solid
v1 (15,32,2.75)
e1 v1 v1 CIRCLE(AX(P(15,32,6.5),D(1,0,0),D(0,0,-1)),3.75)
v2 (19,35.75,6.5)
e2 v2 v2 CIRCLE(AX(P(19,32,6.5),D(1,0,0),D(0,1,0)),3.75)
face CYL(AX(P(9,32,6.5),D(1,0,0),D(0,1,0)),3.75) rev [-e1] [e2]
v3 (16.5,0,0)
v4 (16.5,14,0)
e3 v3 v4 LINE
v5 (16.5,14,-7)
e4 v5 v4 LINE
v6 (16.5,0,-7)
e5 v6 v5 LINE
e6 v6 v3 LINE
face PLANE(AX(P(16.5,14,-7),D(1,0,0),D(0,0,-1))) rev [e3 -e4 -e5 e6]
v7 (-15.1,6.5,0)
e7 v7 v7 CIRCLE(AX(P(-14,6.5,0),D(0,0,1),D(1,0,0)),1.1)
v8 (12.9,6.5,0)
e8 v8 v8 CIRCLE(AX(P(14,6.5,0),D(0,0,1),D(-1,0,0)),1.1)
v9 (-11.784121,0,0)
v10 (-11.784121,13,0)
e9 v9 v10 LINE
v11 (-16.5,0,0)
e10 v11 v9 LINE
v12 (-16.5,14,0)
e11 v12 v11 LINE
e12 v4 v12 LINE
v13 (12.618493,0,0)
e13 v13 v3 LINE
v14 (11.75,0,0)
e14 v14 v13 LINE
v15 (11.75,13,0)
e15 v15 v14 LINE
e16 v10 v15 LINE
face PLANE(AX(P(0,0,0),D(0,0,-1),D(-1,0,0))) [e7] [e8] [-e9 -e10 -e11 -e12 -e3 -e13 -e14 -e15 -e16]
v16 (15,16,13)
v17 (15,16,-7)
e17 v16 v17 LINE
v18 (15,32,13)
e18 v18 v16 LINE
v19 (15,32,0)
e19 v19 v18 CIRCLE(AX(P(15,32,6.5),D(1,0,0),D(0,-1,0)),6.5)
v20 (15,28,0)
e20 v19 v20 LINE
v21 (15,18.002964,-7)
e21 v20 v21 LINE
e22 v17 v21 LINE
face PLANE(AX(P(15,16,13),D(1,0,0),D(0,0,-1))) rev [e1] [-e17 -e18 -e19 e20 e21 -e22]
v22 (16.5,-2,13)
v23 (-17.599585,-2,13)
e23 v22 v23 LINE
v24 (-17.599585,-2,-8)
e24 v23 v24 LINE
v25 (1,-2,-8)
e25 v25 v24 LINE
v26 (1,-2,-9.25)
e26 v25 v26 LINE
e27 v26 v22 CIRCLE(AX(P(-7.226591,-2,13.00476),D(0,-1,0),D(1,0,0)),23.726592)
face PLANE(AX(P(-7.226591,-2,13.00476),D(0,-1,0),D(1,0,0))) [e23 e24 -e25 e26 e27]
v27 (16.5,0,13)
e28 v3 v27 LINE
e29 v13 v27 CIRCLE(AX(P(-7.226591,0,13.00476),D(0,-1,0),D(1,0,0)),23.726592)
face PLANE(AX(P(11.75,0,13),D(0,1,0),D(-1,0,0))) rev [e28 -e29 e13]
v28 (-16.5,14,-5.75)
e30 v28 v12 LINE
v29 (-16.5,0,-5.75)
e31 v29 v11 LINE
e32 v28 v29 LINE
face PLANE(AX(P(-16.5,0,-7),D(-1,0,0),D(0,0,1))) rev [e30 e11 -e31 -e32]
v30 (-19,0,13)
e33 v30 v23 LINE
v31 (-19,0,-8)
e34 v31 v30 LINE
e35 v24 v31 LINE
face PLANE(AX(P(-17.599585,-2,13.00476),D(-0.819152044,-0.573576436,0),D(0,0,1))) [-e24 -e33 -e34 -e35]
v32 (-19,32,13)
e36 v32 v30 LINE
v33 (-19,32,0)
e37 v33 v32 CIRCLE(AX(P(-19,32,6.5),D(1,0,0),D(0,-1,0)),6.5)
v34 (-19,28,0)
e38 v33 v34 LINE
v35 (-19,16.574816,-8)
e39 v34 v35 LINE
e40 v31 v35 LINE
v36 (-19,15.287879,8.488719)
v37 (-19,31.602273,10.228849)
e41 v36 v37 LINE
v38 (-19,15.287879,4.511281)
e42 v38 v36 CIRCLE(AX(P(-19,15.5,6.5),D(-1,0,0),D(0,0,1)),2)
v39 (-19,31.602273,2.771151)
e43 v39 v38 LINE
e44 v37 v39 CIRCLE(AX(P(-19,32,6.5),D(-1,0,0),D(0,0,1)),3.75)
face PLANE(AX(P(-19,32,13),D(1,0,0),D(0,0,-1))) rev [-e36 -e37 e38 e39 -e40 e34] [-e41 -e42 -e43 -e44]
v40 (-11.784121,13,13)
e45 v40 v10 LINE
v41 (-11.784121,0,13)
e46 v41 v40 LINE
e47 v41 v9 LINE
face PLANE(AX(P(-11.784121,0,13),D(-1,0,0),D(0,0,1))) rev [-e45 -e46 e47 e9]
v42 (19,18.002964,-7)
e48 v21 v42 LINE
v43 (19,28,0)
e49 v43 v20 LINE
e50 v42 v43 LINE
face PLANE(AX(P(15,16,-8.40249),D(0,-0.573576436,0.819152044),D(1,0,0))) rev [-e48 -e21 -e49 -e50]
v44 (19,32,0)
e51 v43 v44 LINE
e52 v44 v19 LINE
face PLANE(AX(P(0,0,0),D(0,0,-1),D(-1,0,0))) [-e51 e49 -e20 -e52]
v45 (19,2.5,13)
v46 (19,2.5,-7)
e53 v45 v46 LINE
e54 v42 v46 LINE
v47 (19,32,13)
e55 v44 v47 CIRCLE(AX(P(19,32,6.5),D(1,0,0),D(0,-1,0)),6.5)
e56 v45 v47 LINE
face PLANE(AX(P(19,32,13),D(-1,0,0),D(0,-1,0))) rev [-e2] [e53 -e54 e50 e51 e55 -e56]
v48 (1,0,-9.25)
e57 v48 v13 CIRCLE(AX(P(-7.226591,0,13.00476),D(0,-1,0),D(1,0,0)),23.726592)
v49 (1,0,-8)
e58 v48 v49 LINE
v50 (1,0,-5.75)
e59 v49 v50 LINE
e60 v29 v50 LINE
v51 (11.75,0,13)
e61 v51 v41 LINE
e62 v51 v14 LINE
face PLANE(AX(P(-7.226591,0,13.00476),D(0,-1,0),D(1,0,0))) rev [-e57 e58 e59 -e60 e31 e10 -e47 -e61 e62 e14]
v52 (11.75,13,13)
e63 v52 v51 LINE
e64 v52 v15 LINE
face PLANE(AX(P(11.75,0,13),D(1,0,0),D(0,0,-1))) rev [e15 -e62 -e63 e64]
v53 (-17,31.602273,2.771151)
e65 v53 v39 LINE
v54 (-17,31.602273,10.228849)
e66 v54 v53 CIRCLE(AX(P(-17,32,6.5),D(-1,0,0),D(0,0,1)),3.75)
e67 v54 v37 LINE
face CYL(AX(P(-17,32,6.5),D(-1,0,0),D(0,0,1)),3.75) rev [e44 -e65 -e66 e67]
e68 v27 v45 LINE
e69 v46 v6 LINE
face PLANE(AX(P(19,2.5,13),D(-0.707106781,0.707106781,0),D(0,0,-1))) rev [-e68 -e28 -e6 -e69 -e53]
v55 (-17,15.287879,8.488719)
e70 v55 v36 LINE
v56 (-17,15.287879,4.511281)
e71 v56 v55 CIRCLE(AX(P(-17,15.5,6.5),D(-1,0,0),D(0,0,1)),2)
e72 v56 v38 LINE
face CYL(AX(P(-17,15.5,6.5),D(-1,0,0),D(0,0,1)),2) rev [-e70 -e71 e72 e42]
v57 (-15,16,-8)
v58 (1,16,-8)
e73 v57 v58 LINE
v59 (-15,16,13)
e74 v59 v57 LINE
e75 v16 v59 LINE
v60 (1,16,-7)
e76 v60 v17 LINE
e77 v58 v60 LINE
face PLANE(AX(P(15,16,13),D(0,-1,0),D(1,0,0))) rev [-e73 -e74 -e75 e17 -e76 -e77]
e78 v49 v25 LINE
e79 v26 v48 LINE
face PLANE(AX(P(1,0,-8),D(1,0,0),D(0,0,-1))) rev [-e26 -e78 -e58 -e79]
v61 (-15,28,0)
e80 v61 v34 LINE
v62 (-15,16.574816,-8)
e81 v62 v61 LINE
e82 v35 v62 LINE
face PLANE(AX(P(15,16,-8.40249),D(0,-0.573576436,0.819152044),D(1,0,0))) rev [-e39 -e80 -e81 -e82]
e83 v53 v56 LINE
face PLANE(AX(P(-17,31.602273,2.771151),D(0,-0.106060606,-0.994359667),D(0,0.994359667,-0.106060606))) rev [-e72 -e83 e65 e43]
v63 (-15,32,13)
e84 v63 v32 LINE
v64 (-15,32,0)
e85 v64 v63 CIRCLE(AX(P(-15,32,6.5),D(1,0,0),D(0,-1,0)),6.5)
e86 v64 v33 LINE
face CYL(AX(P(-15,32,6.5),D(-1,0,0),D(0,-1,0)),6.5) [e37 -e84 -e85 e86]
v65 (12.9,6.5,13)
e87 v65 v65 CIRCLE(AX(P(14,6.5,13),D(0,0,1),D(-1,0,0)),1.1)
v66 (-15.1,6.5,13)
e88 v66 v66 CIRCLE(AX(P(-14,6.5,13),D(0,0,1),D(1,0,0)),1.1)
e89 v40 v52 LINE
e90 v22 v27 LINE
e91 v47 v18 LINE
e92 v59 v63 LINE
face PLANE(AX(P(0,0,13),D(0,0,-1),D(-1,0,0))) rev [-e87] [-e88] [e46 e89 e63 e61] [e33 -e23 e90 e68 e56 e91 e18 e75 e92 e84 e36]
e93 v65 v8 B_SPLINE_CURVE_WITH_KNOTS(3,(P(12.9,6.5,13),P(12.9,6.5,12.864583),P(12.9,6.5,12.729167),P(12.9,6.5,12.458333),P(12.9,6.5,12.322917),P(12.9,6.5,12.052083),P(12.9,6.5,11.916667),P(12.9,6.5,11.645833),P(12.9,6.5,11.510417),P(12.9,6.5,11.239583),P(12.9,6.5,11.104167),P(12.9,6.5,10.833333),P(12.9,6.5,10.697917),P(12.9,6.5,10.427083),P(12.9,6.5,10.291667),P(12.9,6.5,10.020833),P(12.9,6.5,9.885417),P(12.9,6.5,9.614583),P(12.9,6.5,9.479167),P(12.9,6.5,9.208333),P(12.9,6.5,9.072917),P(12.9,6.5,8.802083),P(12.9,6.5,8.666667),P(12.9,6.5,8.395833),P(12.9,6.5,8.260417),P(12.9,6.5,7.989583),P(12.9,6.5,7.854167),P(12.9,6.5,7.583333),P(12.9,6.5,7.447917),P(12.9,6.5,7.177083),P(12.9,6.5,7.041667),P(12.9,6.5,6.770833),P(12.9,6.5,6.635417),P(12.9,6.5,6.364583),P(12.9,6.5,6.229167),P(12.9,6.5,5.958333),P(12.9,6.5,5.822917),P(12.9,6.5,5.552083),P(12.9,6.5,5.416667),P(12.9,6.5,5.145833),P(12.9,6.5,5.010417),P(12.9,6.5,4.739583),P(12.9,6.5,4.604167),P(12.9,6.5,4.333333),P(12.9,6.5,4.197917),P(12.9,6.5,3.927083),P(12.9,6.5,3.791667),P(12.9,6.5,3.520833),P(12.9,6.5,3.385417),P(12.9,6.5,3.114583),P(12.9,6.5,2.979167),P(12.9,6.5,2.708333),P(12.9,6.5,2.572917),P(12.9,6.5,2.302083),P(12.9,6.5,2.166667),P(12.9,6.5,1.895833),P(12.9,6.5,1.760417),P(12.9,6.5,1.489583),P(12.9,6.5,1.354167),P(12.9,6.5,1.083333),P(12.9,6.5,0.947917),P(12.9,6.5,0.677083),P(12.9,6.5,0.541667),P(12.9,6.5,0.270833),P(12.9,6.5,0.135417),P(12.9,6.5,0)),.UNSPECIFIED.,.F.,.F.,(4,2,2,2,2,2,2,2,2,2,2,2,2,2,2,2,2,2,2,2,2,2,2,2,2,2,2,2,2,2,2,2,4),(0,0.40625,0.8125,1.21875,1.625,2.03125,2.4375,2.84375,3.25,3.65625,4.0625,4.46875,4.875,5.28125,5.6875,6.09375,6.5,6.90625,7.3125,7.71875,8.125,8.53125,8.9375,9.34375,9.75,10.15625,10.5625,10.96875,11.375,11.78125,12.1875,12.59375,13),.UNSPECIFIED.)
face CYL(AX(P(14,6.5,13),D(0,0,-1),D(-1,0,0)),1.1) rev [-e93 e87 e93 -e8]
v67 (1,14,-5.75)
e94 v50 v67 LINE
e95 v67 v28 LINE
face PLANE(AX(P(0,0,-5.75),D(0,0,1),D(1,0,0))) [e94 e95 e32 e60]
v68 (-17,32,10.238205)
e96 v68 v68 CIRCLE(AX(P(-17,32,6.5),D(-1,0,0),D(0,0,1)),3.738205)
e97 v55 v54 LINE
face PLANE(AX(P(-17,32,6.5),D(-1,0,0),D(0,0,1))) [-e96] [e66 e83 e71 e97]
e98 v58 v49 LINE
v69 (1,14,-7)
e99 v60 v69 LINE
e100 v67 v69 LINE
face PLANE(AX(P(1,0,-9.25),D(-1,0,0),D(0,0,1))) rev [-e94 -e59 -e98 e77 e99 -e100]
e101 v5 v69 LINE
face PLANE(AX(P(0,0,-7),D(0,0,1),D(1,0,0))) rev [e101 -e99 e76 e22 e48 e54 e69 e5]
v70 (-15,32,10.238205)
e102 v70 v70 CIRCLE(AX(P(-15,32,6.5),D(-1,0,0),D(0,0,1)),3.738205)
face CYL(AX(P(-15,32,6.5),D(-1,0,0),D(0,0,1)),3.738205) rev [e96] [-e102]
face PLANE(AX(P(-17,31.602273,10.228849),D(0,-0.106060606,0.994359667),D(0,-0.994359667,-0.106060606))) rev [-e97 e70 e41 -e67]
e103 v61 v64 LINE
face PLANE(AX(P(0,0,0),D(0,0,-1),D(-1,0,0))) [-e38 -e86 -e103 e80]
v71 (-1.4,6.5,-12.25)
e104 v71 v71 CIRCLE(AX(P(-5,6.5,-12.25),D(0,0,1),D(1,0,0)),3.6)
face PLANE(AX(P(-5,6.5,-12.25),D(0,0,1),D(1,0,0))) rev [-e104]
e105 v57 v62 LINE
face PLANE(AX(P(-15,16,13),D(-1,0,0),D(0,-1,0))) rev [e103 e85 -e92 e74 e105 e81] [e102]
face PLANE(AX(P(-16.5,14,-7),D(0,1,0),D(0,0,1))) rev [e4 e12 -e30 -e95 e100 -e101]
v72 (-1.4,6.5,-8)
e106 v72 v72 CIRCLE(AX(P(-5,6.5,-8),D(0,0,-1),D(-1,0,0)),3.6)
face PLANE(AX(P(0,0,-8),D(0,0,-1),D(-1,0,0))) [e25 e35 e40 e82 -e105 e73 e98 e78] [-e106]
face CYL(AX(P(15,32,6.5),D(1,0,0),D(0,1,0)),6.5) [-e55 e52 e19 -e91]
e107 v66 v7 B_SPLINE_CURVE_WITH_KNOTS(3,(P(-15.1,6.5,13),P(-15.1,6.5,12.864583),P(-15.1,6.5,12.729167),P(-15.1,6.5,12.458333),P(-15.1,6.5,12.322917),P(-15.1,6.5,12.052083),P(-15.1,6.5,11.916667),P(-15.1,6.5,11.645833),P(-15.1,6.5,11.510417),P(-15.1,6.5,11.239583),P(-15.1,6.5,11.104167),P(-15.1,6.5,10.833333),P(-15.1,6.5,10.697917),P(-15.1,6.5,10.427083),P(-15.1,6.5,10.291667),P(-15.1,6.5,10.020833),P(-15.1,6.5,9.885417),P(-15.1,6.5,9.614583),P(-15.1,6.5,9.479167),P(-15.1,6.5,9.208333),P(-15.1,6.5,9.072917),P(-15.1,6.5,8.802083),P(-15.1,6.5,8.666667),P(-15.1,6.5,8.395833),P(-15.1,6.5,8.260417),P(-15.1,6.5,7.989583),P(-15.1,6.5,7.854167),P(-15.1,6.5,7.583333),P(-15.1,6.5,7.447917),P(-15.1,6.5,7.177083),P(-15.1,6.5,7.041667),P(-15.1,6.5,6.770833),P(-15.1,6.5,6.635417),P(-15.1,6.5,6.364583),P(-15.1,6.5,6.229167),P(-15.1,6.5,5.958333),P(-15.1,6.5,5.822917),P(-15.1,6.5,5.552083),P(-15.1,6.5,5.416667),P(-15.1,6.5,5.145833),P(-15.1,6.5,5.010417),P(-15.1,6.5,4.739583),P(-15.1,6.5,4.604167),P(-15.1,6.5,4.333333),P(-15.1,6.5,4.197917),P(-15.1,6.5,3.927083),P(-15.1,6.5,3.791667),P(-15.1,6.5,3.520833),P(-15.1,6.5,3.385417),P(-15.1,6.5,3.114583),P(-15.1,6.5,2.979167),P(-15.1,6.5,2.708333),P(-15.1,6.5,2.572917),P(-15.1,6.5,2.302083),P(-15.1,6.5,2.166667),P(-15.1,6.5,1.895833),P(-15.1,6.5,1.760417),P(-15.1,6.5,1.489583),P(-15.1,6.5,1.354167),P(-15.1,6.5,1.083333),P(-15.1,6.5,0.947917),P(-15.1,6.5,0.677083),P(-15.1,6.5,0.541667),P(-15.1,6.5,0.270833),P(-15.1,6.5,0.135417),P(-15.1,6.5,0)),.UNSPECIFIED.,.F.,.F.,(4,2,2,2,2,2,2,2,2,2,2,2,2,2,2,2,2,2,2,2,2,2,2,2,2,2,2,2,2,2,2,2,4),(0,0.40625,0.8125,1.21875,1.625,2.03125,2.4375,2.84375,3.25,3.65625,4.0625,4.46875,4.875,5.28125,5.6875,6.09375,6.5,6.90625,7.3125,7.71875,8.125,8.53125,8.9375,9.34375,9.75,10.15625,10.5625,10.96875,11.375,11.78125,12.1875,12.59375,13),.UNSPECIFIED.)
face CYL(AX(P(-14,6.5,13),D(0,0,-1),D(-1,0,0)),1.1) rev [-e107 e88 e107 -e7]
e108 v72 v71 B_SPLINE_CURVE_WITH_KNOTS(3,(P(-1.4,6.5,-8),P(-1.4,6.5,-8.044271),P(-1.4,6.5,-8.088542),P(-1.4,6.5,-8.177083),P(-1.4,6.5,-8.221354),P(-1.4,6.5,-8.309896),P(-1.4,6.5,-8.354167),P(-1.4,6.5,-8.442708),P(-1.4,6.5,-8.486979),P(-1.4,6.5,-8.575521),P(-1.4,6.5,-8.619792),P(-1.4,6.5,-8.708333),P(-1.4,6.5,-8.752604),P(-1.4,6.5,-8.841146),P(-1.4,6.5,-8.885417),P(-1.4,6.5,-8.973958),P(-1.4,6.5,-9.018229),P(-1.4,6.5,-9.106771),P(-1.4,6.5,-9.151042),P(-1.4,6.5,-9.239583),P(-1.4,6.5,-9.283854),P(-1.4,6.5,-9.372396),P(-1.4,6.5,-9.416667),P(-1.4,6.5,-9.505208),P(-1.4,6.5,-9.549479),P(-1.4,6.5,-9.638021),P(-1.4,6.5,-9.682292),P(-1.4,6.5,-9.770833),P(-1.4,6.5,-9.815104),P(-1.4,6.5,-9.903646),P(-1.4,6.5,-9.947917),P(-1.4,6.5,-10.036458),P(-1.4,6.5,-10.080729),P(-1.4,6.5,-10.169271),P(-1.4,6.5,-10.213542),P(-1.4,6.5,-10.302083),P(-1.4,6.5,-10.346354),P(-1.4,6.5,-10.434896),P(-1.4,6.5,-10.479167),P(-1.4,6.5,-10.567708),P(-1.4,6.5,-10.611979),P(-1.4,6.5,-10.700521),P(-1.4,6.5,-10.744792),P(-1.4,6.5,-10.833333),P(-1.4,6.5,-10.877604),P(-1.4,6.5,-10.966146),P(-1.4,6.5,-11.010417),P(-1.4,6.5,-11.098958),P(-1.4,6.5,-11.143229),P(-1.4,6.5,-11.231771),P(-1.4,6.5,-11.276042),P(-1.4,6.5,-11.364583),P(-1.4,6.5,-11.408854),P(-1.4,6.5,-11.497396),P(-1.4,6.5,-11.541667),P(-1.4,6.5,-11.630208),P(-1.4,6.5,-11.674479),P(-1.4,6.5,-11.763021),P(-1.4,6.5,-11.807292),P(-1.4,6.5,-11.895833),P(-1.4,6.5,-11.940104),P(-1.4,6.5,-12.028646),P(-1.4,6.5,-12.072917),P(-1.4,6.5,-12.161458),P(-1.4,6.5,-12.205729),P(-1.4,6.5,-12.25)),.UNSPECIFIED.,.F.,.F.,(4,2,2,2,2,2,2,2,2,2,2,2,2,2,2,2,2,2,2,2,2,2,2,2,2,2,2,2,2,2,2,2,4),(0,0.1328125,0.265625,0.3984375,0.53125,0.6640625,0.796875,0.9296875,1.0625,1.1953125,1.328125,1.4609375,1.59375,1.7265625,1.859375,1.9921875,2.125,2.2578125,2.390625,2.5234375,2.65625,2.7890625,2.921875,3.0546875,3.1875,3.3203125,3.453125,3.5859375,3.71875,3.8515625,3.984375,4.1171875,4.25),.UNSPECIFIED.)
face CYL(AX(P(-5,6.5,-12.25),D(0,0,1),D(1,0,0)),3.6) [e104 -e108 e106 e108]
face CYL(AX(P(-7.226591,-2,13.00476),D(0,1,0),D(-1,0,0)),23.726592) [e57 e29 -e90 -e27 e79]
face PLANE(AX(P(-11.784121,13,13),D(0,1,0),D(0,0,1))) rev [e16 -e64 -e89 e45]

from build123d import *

# Parameters (mm, degrees)
SKETCH_1_R          = 1.1
EXTRUDE_1_DEPTH     = 13
EXTRUDE_2_DEPTH     = 4
CUT_EXTRUDE_1_DEPTH = 2
SKETCH_4_R          = 3.738204999
CUT_EXTRUDE_2_DEPTH = 2
EXTRUDE_4_DEPTH     = 7
CUT_EXTRUDE_START   = -10
SKETCH_9_R          = 3.75
CUT_EXTRUDE_3_DEPTH = 10
SKETCH_10_W         = 20
SKETCH_10_H         = 16
EXTRUDE_5_DEPTH     = 2.25
CHAMFER_1_SIZE      = 2.5
EXTRUDE_8_DEPTH     = 2
CUT_EXTRUDE_4_DEPTH = 1.25
SKETCH_11_R         = 3.6
EXTRUDE_9_DEPTH     = 5.25
SKETCH_15_W         = 17.5
SKETCH_15_H         = 14
EXTRUDE_10_DEPTH    = 1.25
CHAMFER_2_SIZE      = 12
CHAMFER_2_SIZE_2    = 8.402490459
CHAMFER_3_SIZE      = 8.402490459
CHAMFER_3_SIZE_2    = 12
CHAMFER_4_SIZE      = 2
CHAMFER_4_SIZE2     = 1.400415076


with BuildPart() as part:
    # 草图1 → 凸台-拉伸1 (new body)
    with BuildSketch(Plane.XY):
        Polygon((15, 16), (-15, 16), (-15, 32), (-19, 32), (-19, 0), (-11.784120735, 0), (-11.784120735, 13), (11.75, 13), (11.75, 0), (19, 0), (19, 32), (15, 32), align=None)
        with Locations(Location((-14, 6.5, 0), (0, 0, 180))):
            Circle(SKETCH_1_R, mode=Mode.SUBTRACT)
        with Locations(Location((14, 6.5, 0), (0, 0, 180))):
            Circle(SKETCH_1_R, mode=Mode.SUBTRACT)
    extrude(amount=EXTRUDE_1_DEPTH)

    # 草图2 → 凸台-拉伸2 (add)
    with BuildSketch(Plane(origin=(19, 0, 0), x_dir=(0, 0, -1), z_dir=(1, 0, 0))):
        with BuildLine():
            Line((0, 32), (-13, 32))
            ThreePointArc((-13, 32), (-6.5, 38.5), (0, 32))
        make_face()
    extrude_2 = extrude(amount=-EXTRUDE_2_DEPTH)

    # 镜向1: 凸台-拉伸2 across plane
    add(extrude_2.mirror(Plane(origin=(0, 0, 0), x_dir=(0, 0, 1), z_dir=(1, 0, 0))))

    # 草图3 → 切除-拉伸1 (cut)
    with BuildSketch(Plane.ZY.offset(19)):
        with BuildLine():
            Line((2.771151248, 31.602272727), (4.511280666, 15.287878788))
            ThreePointArc((4.511280666, 15.287878788), (6.5, 13.5), (8.488719334, 15.287878788))
            Line((8.488719334, 15.287878788), (10.228848752, 31.602272727))
            ThreePointArc((10.228848752, 31.602272727), (6.5, 35.75), (2.771151248, 31.602272727))
        make_face()
    extrude(amount=-CUT_EXTRUDE_1_DEPTH, mode=Mode.SUBTRACT)

    # 草图4 → 切除-拉伸2 (cut)
    with BuildSketch(Plane.ZY.offset(17)):
        with Locations((6.5, 32)):
            Circle(SKETCH_4_R)
    extrude(amount=-CUT_EXTRUDE_2_DEPTH, mode=Mode.SUBTRACT)

    # 草图5 → 凸台-拉伸4 (add)
    with BuildSketch(Plane(origin=(0, 0, 0), x_dir=(-1, 0, 0), z_dir=(0, 0, -1))):
        Polygon((-19, 16), (19, 16), (19, 0), (16.5, 0), (16.5, 14), (-16.5, 14), (-16.5, 0), (-19, 0), align=None)
    extrude(amount=EXTRUDE_4_DEPTH)

    # 草图9 → 切除-拉伸3 (cut)
    with BuildSketch(Plane(origin=(19, 0, 0), x_dir=(0, 0, -1), z_dir=(1, 0, 0)).offset(CUT_EXTRUDE_START)):
        with Locations(Location((-6.5, 32, 0), (0, 0, 90))):
            Circle(SKETCH_9_R)
    extrude(amount=CUT_EXTRUDE_3_DEPTH, mode=Mode.SUBTRACT)

    # 草图10 → 凸台-拉伸5 (add)
    with BuildSketch(Plane(origin=(0, 0, -7), x_dir=(-1, 0, 0), z_dir=(0, 0, -1))):
        with Locations((9, 8)):
            Rectangle(SKETCH_10_W, SKETCH_10_H)
    extrude(amount=EXTRUDE_5_DEPTH)

    # 倒角1
    chamfer_1_edges = [part.edges().sort_by_distance(p)[0] for p in [
        (19, 0, 3),
    ]]
    chamfer(chamfer_1_edges, length=CHAMFER_1_SIZE)

    # 草图12 → 凸台-拉伸8 (add)
    with BuildSketch(Plane.XZ):
        with BuildLine():
            Line((1, 13), (16.5, 13))
            ThreePointArc((16.5, 13), (12.241770088, -0.55746905), (1, -9.25))
            Line((1, -9.25), (-19, -9.25))
            Line((-19, -9.25), (-19, 13))
            Line((-19, 13), (1, 13))
        make_face()
    extrude(amount=EXTRUDE_8_DEPTH)

    # 草图13 → 切除-拉伸4 (cut)
    with BuildSketch(Plane(origin=(0, 0, -9.25), x_dir=(-1, 0, 0), z_dir=(0, 0, -1))):
        Polygon((19, -2), (19, 16), (-1, 16), (-1, 0), (-1, -2), align=None)
    extrude(amount=-CUT_EXTRUDE_4_DEPTH, mode=Mode.SUBTRACT)

    # 草图11 → 凸台-拉伸9 (add)
    with BuildSketch(Plane.XY.offset(-7)):
        with Locations((-5, 6.5)):
            Circle(SKETCH_11_R)
    extrude(amount=-EXTRUDE_9_DEPTH)

    # 草图15 → 凸台-拉伸10 (add)
    with BuildSketch(Plane.XY.offset(-7)):
        with Locations((-7.75, 7)):
            Rectangle(SKETCH_15_W, SKETCH_15_H)
    extrude(amount=EXTRUDE_10_DEPTH)

    # 倒角2
    # the kernel refuses this chamfer: 12, 8.402490459 mm, written as the material it adds along each edge
    with BuildSketch(Plane(origin=(-15, 16, 0), x_dir=(0, 0.9997533347641299, 0.022209674198457065), z_dir=(-1, 0, 0))) as chamfer_2_piece_1_section:
        Polygon((CHAMFER_2_SIZE * 0.999753334764, CHAMFER_2_SIZE * 0.0222096741985), (-CHAMFER_2_SIZE_2 * 0.0222096741972, CHAMFER_2_SIZE_2 * 0.999753334707), (0, 0), align=None)
    chamfer_2_piece_1 = extrude(amount=4, mode=Mode.PRIVATE)
    chamfer_2_piece_1 = split(chamfer_2_piece_1, bisect_by=Plane(origin=(-17, 20.095500367, -8), z_dir=(0, 0, 1)), keep=Keep.TOP, mode=Mode.PRIVATE)
    add(chamfer_2_piece_1)

    # 倒角3
    # the kernel refuses this chamfer: 12, 8.402490459 mm, written as the material it adds along each edge
    with BuildSketch(Plane(origin=(19, 16, 0), x_dir=(0, -0.045263737714020834, -0.9989750717851553), z_dir=(-1, 0, 0))) as chamfer_3_piece_1_section:
        Polygon((CHAMFER_3_SIZE * 0.998975071728, -CHAMFER_3_SIZE * 0.0452637377114), (-CHAMFER_3_SIZE_2 * 0.045263737714, -CHAMFER_3_SIZE_2 * 0.998975071785), (0, 0), align=None)
    chamfer_3_piece_1 = extrude(amount=4, mode=Mode.PRIVATE)
    chamfer_3_piece_1 = split(chamfer_3_piece_1, bisect_by=Plane(origin=(17, 20.095500367, -7), z_dir=(0, 0, 1)), keep=Keep.TOP, mode=Mode.PRIVATE)
    add(chamfer_3_piece_1)

    # 倒角4
    chamfer_4_edges = [part.edges().sort_by_distance(p)[0] for p in [
        (-19, -2, 2.5),
    ]]
    chamfer_4_side = [part.faces().sort_by_distance(p)[0] for p in [
        (-19, 13.42478673, 3.080992557),
    ]]
    chamfer(chamfer_4_edges, length=CHAMFER_4_SIZE, length2=CHAMFER_4_SIZE2, reference=chamfer_4_side[0])


solid = part.part
